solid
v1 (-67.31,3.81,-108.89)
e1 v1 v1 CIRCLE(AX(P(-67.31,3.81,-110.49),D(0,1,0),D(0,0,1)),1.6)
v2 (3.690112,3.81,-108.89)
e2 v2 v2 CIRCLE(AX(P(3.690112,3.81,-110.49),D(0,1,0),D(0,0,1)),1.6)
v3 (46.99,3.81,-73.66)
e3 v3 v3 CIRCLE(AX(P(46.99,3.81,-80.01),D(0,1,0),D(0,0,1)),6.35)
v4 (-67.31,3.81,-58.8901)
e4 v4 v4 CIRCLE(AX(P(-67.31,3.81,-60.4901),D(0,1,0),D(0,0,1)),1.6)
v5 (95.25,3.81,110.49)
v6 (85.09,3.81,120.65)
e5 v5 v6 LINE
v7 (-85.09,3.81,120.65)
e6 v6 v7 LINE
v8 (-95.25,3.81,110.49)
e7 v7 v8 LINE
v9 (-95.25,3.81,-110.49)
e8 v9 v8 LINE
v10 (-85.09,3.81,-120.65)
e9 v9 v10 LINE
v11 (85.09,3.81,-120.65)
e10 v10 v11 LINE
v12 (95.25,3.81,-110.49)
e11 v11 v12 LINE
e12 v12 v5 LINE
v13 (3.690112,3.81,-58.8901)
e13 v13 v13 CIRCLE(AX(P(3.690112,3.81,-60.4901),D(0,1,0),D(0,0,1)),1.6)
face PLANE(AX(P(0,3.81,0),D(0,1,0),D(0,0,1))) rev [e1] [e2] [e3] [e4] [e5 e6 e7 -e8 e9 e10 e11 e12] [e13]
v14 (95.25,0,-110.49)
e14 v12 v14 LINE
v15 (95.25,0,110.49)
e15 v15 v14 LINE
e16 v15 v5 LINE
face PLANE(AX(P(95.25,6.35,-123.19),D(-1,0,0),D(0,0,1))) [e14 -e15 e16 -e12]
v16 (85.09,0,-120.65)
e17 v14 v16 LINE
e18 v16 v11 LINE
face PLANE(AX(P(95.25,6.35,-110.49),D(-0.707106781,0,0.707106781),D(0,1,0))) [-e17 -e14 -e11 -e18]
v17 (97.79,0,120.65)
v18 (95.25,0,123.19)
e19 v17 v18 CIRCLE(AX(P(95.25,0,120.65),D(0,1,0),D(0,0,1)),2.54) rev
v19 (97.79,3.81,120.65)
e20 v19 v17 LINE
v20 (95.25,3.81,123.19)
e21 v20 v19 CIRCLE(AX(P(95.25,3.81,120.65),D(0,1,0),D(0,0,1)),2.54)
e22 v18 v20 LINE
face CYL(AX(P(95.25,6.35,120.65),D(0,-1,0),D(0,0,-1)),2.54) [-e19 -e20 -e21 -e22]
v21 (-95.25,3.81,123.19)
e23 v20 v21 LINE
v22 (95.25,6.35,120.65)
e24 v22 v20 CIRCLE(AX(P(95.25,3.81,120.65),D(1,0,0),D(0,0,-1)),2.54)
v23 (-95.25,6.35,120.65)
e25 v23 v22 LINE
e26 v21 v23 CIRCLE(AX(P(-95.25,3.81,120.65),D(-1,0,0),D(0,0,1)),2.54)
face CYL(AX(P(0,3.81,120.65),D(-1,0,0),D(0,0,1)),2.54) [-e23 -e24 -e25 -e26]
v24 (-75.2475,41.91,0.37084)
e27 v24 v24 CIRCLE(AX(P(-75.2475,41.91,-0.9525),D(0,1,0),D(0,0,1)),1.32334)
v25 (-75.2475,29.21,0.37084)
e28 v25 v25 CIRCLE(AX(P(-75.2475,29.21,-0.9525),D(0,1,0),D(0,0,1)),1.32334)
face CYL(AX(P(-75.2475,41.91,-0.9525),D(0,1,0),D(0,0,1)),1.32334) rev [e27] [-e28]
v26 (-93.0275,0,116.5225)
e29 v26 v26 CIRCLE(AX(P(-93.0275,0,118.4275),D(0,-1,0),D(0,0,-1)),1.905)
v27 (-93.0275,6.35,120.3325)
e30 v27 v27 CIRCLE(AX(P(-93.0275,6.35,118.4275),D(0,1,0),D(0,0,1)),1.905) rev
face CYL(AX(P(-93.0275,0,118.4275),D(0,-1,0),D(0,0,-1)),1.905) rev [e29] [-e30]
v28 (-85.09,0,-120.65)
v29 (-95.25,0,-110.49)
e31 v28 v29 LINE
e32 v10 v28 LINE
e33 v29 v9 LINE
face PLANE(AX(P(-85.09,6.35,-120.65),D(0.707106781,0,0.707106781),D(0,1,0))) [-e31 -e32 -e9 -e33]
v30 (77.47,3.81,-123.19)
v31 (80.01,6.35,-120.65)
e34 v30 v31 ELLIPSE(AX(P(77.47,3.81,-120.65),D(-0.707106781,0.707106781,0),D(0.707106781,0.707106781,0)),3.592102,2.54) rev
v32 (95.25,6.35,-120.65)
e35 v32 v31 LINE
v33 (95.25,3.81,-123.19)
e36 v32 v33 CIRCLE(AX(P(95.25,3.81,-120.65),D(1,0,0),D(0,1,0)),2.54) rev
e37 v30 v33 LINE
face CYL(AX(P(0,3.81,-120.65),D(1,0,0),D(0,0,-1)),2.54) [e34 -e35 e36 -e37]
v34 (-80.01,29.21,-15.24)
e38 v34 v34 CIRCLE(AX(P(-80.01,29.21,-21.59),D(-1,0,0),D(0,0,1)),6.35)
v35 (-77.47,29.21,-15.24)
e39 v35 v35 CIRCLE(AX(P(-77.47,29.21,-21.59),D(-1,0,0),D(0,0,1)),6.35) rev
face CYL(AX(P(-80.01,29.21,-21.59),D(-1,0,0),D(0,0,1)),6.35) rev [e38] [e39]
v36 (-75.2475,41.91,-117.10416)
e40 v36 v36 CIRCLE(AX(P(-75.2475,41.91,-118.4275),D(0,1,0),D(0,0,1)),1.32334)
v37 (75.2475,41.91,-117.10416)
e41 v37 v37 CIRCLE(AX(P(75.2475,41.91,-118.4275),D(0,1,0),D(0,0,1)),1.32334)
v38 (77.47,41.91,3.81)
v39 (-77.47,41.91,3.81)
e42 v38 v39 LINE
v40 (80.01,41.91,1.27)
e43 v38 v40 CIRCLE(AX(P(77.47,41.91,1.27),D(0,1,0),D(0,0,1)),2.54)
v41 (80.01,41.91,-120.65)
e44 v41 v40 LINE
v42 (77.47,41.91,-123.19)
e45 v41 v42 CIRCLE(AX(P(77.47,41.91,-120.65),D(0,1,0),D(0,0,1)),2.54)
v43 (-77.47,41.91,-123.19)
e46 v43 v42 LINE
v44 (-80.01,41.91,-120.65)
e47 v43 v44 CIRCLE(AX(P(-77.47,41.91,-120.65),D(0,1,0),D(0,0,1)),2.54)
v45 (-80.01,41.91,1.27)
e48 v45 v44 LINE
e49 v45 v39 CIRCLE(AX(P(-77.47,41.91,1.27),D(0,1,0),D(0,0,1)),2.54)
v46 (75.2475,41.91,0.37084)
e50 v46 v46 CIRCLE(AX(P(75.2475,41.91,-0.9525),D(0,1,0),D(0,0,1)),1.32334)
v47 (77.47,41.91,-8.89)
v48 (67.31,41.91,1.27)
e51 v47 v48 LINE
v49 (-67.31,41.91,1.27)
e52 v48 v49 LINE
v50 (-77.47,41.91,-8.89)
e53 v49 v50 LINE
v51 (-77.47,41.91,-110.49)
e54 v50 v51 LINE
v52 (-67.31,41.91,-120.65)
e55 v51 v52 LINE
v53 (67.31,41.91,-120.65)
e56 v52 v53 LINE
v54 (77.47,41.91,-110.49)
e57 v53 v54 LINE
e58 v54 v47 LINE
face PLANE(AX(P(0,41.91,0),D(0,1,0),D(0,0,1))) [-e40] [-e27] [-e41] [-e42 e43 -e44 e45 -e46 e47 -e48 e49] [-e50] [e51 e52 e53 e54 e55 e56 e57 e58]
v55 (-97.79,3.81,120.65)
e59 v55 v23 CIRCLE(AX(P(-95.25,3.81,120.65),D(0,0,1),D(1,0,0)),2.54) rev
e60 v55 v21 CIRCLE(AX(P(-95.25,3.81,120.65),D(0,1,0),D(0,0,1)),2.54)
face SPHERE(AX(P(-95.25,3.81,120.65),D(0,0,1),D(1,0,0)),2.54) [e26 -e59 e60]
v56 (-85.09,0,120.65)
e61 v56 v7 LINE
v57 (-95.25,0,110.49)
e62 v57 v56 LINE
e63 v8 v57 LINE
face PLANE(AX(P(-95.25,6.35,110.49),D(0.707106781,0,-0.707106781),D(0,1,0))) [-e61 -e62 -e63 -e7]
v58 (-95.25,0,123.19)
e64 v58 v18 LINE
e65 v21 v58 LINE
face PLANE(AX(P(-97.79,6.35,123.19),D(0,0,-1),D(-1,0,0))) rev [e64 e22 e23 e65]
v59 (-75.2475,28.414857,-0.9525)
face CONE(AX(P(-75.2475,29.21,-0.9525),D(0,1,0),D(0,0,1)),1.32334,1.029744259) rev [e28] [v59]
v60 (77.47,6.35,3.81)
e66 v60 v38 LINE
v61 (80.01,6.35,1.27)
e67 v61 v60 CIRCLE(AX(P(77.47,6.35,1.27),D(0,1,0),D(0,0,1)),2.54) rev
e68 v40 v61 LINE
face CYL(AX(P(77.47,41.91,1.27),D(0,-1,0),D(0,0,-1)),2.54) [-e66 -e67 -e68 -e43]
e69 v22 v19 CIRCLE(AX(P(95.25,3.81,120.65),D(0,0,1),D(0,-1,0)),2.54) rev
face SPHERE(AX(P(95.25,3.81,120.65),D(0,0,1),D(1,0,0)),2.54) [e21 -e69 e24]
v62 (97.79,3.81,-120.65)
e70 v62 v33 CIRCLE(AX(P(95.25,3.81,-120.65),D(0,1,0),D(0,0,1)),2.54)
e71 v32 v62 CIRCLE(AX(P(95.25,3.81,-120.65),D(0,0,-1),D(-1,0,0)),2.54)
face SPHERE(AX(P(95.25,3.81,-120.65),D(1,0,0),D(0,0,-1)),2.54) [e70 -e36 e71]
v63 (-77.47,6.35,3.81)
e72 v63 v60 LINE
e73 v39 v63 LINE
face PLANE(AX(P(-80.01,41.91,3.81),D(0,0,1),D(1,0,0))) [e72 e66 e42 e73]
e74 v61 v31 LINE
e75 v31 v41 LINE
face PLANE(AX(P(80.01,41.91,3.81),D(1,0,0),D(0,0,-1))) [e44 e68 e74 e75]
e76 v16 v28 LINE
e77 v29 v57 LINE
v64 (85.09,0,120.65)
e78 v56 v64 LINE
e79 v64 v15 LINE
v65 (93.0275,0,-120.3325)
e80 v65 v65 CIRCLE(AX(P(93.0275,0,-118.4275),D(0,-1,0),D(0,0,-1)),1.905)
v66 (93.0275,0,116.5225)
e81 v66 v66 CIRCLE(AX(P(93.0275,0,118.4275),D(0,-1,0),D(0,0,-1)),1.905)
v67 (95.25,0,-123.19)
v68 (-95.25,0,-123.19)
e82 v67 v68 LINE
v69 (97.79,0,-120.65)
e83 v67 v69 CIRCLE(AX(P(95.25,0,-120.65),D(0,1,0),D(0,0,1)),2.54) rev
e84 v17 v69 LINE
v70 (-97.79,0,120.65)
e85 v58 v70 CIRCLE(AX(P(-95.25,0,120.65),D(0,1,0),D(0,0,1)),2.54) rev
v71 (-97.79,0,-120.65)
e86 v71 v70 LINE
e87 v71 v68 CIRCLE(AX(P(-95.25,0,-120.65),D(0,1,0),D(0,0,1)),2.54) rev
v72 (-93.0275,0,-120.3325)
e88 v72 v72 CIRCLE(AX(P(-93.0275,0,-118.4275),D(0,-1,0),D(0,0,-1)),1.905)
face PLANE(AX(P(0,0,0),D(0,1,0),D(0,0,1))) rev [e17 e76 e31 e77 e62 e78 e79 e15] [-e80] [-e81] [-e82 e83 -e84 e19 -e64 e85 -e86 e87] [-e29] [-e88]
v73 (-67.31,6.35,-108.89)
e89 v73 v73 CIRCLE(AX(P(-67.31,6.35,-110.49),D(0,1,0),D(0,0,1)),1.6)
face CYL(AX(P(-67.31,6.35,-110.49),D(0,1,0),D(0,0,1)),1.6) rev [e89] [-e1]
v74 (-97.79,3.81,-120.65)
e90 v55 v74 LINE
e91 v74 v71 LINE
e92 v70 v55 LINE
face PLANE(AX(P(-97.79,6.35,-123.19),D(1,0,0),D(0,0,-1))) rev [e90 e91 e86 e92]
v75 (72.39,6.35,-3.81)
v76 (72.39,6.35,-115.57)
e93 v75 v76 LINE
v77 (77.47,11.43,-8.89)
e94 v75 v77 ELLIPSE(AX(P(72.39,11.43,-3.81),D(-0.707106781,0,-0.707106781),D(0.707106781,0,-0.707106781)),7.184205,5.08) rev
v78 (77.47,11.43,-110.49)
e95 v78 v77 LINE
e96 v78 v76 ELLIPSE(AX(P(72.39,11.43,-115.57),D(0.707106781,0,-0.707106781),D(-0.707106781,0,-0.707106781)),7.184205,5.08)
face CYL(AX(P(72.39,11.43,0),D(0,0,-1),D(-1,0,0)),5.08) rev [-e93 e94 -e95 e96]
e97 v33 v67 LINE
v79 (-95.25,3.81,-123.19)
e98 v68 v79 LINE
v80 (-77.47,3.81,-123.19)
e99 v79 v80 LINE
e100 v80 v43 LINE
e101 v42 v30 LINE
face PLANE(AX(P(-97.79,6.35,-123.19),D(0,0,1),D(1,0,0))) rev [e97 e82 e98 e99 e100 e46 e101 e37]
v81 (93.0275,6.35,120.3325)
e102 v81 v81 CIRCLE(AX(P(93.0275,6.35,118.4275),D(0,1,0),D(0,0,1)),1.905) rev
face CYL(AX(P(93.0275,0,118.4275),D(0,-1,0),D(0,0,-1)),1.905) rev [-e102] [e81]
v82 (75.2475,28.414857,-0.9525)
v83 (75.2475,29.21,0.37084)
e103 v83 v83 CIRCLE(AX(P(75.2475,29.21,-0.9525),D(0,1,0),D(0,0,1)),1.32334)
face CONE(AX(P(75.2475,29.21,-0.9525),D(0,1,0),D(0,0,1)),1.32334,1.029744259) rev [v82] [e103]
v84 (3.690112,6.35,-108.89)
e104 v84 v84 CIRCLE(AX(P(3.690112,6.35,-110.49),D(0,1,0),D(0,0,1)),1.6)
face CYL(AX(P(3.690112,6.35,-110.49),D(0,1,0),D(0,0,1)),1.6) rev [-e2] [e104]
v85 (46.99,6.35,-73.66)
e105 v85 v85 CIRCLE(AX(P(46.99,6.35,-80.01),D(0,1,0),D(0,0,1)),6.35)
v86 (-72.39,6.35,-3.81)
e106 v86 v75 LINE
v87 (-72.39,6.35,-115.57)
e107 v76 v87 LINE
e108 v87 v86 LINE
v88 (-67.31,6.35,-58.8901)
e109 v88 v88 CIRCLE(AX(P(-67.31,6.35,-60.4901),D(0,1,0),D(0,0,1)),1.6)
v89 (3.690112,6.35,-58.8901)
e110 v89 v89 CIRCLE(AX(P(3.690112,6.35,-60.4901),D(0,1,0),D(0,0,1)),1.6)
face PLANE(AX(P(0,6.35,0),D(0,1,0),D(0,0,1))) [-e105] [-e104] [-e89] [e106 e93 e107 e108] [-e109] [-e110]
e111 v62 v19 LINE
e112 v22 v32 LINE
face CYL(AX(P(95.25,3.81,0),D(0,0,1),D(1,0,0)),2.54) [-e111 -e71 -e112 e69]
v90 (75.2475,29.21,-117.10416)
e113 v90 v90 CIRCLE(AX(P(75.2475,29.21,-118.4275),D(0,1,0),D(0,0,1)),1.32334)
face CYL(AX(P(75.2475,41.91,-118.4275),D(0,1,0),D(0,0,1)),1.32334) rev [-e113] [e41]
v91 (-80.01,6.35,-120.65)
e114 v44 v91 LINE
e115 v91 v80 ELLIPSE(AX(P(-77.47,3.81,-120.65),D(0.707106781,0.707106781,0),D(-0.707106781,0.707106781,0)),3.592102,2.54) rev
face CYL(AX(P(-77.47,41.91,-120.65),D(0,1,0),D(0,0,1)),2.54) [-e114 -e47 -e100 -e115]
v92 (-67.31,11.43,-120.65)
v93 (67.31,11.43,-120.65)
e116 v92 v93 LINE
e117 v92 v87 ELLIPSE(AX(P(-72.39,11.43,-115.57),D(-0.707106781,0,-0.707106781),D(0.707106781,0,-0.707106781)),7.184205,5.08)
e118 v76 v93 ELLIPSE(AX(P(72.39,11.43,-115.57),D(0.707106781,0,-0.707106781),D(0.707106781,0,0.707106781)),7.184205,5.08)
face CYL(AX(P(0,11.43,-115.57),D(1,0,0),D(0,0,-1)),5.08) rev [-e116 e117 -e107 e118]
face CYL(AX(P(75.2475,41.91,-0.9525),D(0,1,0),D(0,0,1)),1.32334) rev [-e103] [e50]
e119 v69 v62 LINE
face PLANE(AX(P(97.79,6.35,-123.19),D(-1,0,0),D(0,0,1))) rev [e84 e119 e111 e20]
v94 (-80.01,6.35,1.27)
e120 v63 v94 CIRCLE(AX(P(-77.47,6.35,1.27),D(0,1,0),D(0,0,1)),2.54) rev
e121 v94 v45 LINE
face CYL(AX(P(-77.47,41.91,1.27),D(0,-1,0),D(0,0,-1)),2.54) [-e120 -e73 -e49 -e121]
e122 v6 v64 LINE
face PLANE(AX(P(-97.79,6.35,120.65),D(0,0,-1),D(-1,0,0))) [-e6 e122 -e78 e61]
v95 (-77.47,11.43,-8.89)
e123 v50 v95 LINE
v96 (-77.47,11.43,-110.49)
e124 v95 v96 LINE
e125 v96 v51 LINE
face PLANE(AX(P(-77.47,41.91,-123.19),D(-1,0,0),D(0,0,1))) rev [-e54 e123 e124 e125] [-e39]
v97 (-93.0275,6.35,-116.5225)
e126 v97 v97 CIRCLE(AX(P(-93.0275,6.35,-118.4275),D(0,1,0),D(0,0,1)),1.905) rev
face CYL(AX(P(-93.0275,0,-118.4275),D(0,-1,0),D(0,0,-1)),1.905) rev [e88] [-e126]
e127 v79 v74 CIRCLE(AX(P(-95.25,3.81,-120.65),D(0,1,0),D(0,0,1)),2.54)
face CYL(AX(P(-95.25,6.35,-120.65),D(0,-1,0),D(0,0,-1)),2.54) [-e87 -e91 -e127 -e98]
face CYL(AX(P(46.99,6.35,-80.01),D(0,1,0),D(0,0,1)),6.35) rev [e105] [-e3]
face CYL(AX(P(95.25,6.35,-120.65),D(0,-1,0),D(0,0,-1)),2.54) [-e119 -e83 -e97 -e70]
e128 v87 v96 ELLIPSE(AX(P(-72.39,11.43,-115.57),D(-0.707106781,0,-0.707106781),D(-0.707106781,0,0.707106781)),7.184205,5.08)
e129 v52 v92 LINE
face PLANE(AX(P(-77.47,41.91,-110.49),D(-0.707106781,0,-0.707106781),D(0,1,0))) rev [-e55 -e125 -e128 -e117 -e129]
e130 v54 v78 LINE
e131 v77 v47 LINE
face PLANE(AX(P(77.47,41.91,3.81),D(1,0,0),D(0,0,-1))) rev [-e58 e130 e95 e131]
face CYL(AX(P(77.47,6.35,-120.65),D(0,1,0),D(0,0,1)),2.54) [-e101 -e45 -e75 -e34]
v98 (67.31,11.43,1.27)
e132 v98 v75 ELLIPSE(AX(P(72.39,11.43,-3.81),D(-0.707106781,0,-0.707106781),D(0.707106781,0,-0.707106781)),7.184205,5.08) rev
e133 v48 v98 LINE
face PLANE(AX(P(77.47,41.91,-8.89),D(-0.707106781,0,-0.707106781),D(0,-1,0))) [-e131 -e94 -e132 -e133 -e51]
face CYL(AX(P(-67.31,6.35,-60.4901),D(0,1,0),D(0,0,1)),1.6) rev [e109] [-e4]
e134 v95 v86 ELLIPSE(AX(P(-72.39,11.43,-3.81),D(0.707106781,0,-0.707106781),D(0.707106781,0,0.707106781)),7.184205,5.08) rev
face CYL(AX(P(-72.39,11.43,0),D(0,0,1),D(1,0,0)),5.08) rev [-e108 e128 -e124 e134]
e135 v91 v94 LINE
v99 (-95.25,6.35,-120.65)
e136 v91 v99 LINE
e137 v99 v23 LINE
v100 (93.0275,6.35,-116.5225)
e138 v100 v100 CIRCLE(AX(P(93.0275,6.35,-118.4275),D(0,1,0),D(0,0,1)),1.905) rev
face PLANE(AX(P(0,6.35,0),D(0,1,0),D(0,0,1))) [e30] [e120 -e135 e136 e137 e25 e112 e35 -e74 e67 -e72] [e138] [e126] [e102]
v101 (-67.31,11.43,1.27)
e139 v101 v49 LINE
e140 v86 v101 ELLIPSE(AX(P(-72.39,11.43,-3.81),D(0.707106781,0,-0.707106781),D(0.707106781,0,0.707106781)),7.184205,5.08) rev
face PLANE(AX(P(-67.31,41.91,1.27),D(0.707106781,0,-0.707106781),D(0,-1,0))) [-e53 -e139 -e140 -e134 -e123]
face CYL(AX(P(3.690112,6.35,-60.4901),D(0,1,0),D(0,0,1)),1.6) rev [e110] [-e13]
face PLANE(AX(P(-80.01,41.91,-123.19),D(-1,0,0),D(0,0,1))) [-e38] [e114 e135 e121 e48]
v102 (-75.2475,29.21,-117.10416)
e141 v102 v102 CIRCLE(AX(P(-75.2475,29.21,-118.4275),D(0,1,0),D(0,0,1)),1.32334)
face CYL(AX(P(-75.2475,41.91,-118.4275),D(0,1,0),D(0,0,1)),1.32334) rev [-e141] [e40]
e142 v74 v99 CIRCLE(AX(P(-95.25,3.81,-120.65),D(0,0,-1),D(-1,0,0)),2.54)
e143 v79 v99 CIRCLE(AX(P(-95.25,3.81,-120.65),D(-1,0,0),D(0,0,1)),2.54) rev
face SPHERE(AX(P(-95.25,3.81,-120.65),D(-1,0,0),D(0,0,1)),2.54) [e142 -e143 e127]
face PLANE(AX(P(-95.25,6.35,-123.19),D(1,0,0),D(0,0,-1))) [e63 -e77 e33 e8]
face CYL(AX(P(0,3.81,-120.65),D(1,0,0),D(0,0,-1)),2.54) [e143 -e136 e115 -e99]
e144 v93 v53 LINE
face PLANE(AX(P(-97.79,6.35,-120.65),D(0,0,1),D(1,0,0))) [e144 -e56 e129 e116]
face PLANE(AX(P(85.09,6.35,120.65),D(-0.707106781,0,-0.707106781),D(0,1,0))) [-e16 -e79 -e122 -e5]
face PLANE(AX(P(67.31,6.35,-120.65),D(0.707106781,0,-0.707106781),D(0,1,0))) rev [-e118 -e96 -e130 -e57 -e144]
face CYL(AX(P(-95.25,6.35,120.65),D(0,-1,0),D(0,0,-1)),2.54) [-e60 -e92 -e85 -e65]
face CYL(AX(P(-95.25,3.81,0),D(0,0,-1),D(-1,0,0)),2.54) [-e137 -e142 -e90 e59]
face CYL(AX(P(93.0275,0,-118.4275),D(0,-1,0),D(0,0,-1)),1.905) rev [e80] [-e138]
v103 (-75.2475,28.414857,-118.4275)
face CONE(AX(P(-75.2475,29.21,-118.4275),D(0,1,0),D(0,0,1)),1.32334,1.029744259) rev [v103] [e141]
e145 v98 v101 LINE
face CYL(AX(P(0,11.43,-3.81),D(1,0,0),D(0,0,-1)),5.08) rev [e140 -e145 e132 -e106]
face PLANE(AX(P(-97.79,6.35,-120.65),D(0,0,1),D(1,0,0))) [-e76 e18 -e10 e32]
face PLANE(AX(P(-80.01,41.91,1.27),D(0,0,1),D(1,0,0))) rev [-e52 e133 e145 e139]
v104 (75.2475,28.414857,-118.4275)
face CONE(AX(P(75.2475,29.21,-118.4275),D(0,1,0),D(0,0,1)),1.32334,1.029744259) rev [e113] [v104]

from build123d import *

# Parameters (mm, degrees)
SKETCH2_W                      = 195.58
SKETCH2_H                      = 246.38
BOSS_EXTRUDE1_DEPTH            = 6.35
FILLET1_R                      = 2.54
SHELL1_START                   = -95.25
SHELL1_OUTLINE_W               = 3.81
SHELL1_OUTLINE_H               = 241.3
SHELL1_DEPTH                   = 190.5
SKETCH3_W                      = 160.02
SKETCH3_H                      = 127
BOSS_EXTRUDE2_DEPTH            = 38.1
FILLET2_R                      = 2.54
SHELL2_START                   = 6.35
SHELL2_OUTLINE_W               = 154.94
SHELL2_OUTLINE_H               = 121.92
SHELL2_DEPTH                   = 35.56
FILLET3_R                      = 5.08
ARDUINO_MOUNT_HOLES_D          = 3.2
CHAMFER1_START                 = 5
CHAMFER1_DEPTH                 = 36.91
TOP_COVER_HOLES_D              = 2.64668
TOP_COVER_HOLES_DEPTH          = 12.7
TOP_COVER_HOLES_TIP            = 0.795142892
CHAMFER2_SIZE                  = 10.16
BOTTOM_COVER_HOLES_D           = 3.81
BOTTOM_COVER_HOLES_DEPTH       = 6.35
BOTTOM_COVER_HOLES_TIP         = 1.144639479
HOLE_FOR_WIRING_D              = 12.7
F_1_2_0_5000_DOWEL_HOLE2_D     = 12.7
F_1_2_0_5000_DOWEL_HOLE2_DEPTH = 2.54
F_1_2_0_5000_DOWEL_HOLE2_TIP   = 3.815464931


with BuildPart() as part:
    # Sketch2 → Boss-Extrude1 (new body)
    with BuildSketch(Plane(origin=(0, 0, 0), x_dir=(1, 0, 0), z_dir=(0, 1, 0))):
        Rectangle(SKETCH2_W, SKETCH2_H)
    extrude(amount=BOSS_EXTRUDE1_DEPTH)

    # Fillet1
    fillet1_edges = [part.edges().sort_by_distance(p)[0] for p in [
        (97.79, 6.35, 0),
        (0, 6.35, -123.19),
        (-97.79, 6.35, 0),
        (-97.79, 3.175, -123.19),
        (97.79, 3.175, -123.19),
        (97.79, 3.175, 123.19),
        (-97.79, 3.175, 123.19),
        (0, 6.35, 123.19),
    ]]
    fillet(fillet1_edges, radius=FILLET1_R)

    # Shell1: read off the stored shape, not the designer's step
    # Shell1 outline → Shell1 (cut)
    with BuildSketch(Plane.YZ.offset(SHELL1_START)):
        with Locations((1.905, 0)):
            Rectangle(SHELL1_OUTLINE_W, SHELL1_OUTLINE_H)
    extrude(amount=SHELL1_DEPTH, mode=Mode.SUBTRACT)

    # Sketch3 → Boss-Extrude2 (add)
    with BuildSketch(Plane(origin=(0, 3.81, 0), x_dir=(-1, 0, 0), z_dir=(0, -1, 0))):
        with Locations((0, 59.69)):
            Rectangle(SKETCH3_W, SKETCH3_H)
    extrude(amount=-BOSS_EXTRUDE2_DEPTH)

    # Fillet2
    fillet2_edges = [part.edges().sort_by_distance(p)[0] for p in [
        (80.01, 22.86, -123.19),
        (-80.01, 22.86, -123.19),
        (80.01, 24.13, 3.81),
        (-80.01, 24.13, 3.81),
    ]]
    fillet(fillet2_edges, radius=FILLET2_R)

    # Shell2: read off the stored shape, not the designer's step
    # Shell2 outline → Shell2 (cut)
    with BuildSketch(Plane(origin=(0, 0, 0), x_dir=(1, 0, 0), z_dir=(0, 1, 0)).offset(SHELL2_START)):
        with Locations((0, 59.69)):
            Rectangle(SHELL2_OUTLINE_W, SHELL2_OUTLINE_H)
    extrude(amount=SHELL2_DEPTH, mode=Mode.SUBTRACT)

    # Fillet3
    fillet3_edges = [part.edges().sort_by_distance(p)[0] for p in [
        (0, 6.35, -120.65),
        (77.47, 6.35, -59.69),
        (-77.47, 6.35, -59.69),
        (0, 6.35, 1.27),
    ]]
    fillet(fillet3_edges, radius=FILLET3_R)

    # Arduino Mount holes (through all)
    with Locations(Plane(origin=(0, 6.35, 0), x_dir=(1, 0, 0), z_dir=(0, 1, 0))):
        with Locations((3.690112, 110.49), (3.690112, 60.4901), (-67.31, 60.4901), (-67.31, 110.49)):
            Hole(ARDUINO_MOUNT_HOLES_D / 2)

    # Chamfer1: read off the stored shape, not the designer's step
    # Chamfer1 outline → Chamfer1 (add)
    with BuildSketch(Plane(origin=(0, 0, 0), x_dir=(1, 0, 0), z_dir=(0, 1, 0)).offset(CHAMFER1_START)):
        Polygon((-77.47, 110.49), (-67.31, 120.65), (-77.47, 120.65), align=None)
        Polygon((77.47, 120.65), (67.31, 120.65), (77.47, 110.49), align=None)
        Polygon((-67.31, -1.27), (-77.47, 8.89), (-77.47, -1.27), align=None)
        Polygon((77.47, -1.27), (77.47, 8.89), (67.31, -1.27), align=None)
    extrude(amount=CHAMFER1_DEPTH)

    # Top cover holes
    with Locations(Plane(origin=(0, 41.91, 0), x_dir=(1, 0, 0), z_dir=(0, 1, 0))):
        with Locations((75.2475, 0.9525), (-75.2475, 0.9525), (-75.2475, 118.4275), (75.2475, 118.4275)):
            Hole(TOP_COVER_HOLES_D / 2, depth=TOP_COVER_HOLES_DEPTH)
            with Locations((0, 0, -(TOP_COVER_HOLES_DEPTH + TOP_COVER_HOLES_TIP / 2))):  # 118° drill point
                Cone(0, TOP_COVER_HOLES_D / 2, TOP_COVER_HOLES_TIP, mode=Mode.SUBTRACT)

    # Chamfer2
    chamfer2_edges = [part.edges().sort_by_distance(p)[0] for p in [
        (-95.25, 1.905, -120.65),
        (-95.25, 1.905, 120.65),
        (95.25, 1.905, 120.65),
        (95.25, 1.905, -120.65),
    ]]
    chamfer(chamfer2_edges, length=CHAMFER2_SIZE)

    # Bottom cover holes
    with Locations(Plane(origin=(0, 0, 0), x_dir=(-1, 0, 0), z_dir=(0, -1, 0))):
        with Locations((-93.0275, 118.4275), (93.0275, 118.4275), (93.0275, -118.4275), (-93.0275, -118.4275)):
            Hole(BOTTOM_COVER_HOLES_D / 2, depth=BOTTOM_COVER_HOLES_DEPTH)
            with Locations((0, 0, -(BOTTOM_COVER_HOLES_DEPTH + BOTTOM_COVER_HOLES_TIP / 2))):  # 118° drill point
                Cone(0, BOTTOM_COVER_HOLES_D / 2, BOTTOM_COVER_HOLES_TIP, mode=Mode.SUBTRACT)

    # Hole for Wiring (through all)
    with Locations(Plane(origin=(0, 6.35, 0), x_dir=(1, 0, 0), z_dir=(0, 1, 0))):
        with Locations((46.99, 80.01)):
            Hole(HOLE_FOR_WIRING_D / 2)

    # 1/2 (0.5000) Dowel Hole2
    with Locations(Plane.ZY.offset(80.01)):
        with Locations((-21.59, 29.21)):
            Hole(F_1_2_0_5000_DOWEL_HOLE2_D / 2, depth=F_1_2_0_5000_DOWEL_HOLE2_DEPTH)
            with Locations((0, 0, -(F_1_2_0_5000_DOWEL_HOLE2_DEPTH + F_1_2_0_5000_DOWEL_HOLE2_TIP / 2))):  # 118° drill point
                Cone(0, F_1_2_0_5000_DOWEL_HOLE2_D / 2, F_1_2_0_5000_DOWEL_HOLE2_TIP, mode=Mode.SUBTRACT)


solid = part.part
